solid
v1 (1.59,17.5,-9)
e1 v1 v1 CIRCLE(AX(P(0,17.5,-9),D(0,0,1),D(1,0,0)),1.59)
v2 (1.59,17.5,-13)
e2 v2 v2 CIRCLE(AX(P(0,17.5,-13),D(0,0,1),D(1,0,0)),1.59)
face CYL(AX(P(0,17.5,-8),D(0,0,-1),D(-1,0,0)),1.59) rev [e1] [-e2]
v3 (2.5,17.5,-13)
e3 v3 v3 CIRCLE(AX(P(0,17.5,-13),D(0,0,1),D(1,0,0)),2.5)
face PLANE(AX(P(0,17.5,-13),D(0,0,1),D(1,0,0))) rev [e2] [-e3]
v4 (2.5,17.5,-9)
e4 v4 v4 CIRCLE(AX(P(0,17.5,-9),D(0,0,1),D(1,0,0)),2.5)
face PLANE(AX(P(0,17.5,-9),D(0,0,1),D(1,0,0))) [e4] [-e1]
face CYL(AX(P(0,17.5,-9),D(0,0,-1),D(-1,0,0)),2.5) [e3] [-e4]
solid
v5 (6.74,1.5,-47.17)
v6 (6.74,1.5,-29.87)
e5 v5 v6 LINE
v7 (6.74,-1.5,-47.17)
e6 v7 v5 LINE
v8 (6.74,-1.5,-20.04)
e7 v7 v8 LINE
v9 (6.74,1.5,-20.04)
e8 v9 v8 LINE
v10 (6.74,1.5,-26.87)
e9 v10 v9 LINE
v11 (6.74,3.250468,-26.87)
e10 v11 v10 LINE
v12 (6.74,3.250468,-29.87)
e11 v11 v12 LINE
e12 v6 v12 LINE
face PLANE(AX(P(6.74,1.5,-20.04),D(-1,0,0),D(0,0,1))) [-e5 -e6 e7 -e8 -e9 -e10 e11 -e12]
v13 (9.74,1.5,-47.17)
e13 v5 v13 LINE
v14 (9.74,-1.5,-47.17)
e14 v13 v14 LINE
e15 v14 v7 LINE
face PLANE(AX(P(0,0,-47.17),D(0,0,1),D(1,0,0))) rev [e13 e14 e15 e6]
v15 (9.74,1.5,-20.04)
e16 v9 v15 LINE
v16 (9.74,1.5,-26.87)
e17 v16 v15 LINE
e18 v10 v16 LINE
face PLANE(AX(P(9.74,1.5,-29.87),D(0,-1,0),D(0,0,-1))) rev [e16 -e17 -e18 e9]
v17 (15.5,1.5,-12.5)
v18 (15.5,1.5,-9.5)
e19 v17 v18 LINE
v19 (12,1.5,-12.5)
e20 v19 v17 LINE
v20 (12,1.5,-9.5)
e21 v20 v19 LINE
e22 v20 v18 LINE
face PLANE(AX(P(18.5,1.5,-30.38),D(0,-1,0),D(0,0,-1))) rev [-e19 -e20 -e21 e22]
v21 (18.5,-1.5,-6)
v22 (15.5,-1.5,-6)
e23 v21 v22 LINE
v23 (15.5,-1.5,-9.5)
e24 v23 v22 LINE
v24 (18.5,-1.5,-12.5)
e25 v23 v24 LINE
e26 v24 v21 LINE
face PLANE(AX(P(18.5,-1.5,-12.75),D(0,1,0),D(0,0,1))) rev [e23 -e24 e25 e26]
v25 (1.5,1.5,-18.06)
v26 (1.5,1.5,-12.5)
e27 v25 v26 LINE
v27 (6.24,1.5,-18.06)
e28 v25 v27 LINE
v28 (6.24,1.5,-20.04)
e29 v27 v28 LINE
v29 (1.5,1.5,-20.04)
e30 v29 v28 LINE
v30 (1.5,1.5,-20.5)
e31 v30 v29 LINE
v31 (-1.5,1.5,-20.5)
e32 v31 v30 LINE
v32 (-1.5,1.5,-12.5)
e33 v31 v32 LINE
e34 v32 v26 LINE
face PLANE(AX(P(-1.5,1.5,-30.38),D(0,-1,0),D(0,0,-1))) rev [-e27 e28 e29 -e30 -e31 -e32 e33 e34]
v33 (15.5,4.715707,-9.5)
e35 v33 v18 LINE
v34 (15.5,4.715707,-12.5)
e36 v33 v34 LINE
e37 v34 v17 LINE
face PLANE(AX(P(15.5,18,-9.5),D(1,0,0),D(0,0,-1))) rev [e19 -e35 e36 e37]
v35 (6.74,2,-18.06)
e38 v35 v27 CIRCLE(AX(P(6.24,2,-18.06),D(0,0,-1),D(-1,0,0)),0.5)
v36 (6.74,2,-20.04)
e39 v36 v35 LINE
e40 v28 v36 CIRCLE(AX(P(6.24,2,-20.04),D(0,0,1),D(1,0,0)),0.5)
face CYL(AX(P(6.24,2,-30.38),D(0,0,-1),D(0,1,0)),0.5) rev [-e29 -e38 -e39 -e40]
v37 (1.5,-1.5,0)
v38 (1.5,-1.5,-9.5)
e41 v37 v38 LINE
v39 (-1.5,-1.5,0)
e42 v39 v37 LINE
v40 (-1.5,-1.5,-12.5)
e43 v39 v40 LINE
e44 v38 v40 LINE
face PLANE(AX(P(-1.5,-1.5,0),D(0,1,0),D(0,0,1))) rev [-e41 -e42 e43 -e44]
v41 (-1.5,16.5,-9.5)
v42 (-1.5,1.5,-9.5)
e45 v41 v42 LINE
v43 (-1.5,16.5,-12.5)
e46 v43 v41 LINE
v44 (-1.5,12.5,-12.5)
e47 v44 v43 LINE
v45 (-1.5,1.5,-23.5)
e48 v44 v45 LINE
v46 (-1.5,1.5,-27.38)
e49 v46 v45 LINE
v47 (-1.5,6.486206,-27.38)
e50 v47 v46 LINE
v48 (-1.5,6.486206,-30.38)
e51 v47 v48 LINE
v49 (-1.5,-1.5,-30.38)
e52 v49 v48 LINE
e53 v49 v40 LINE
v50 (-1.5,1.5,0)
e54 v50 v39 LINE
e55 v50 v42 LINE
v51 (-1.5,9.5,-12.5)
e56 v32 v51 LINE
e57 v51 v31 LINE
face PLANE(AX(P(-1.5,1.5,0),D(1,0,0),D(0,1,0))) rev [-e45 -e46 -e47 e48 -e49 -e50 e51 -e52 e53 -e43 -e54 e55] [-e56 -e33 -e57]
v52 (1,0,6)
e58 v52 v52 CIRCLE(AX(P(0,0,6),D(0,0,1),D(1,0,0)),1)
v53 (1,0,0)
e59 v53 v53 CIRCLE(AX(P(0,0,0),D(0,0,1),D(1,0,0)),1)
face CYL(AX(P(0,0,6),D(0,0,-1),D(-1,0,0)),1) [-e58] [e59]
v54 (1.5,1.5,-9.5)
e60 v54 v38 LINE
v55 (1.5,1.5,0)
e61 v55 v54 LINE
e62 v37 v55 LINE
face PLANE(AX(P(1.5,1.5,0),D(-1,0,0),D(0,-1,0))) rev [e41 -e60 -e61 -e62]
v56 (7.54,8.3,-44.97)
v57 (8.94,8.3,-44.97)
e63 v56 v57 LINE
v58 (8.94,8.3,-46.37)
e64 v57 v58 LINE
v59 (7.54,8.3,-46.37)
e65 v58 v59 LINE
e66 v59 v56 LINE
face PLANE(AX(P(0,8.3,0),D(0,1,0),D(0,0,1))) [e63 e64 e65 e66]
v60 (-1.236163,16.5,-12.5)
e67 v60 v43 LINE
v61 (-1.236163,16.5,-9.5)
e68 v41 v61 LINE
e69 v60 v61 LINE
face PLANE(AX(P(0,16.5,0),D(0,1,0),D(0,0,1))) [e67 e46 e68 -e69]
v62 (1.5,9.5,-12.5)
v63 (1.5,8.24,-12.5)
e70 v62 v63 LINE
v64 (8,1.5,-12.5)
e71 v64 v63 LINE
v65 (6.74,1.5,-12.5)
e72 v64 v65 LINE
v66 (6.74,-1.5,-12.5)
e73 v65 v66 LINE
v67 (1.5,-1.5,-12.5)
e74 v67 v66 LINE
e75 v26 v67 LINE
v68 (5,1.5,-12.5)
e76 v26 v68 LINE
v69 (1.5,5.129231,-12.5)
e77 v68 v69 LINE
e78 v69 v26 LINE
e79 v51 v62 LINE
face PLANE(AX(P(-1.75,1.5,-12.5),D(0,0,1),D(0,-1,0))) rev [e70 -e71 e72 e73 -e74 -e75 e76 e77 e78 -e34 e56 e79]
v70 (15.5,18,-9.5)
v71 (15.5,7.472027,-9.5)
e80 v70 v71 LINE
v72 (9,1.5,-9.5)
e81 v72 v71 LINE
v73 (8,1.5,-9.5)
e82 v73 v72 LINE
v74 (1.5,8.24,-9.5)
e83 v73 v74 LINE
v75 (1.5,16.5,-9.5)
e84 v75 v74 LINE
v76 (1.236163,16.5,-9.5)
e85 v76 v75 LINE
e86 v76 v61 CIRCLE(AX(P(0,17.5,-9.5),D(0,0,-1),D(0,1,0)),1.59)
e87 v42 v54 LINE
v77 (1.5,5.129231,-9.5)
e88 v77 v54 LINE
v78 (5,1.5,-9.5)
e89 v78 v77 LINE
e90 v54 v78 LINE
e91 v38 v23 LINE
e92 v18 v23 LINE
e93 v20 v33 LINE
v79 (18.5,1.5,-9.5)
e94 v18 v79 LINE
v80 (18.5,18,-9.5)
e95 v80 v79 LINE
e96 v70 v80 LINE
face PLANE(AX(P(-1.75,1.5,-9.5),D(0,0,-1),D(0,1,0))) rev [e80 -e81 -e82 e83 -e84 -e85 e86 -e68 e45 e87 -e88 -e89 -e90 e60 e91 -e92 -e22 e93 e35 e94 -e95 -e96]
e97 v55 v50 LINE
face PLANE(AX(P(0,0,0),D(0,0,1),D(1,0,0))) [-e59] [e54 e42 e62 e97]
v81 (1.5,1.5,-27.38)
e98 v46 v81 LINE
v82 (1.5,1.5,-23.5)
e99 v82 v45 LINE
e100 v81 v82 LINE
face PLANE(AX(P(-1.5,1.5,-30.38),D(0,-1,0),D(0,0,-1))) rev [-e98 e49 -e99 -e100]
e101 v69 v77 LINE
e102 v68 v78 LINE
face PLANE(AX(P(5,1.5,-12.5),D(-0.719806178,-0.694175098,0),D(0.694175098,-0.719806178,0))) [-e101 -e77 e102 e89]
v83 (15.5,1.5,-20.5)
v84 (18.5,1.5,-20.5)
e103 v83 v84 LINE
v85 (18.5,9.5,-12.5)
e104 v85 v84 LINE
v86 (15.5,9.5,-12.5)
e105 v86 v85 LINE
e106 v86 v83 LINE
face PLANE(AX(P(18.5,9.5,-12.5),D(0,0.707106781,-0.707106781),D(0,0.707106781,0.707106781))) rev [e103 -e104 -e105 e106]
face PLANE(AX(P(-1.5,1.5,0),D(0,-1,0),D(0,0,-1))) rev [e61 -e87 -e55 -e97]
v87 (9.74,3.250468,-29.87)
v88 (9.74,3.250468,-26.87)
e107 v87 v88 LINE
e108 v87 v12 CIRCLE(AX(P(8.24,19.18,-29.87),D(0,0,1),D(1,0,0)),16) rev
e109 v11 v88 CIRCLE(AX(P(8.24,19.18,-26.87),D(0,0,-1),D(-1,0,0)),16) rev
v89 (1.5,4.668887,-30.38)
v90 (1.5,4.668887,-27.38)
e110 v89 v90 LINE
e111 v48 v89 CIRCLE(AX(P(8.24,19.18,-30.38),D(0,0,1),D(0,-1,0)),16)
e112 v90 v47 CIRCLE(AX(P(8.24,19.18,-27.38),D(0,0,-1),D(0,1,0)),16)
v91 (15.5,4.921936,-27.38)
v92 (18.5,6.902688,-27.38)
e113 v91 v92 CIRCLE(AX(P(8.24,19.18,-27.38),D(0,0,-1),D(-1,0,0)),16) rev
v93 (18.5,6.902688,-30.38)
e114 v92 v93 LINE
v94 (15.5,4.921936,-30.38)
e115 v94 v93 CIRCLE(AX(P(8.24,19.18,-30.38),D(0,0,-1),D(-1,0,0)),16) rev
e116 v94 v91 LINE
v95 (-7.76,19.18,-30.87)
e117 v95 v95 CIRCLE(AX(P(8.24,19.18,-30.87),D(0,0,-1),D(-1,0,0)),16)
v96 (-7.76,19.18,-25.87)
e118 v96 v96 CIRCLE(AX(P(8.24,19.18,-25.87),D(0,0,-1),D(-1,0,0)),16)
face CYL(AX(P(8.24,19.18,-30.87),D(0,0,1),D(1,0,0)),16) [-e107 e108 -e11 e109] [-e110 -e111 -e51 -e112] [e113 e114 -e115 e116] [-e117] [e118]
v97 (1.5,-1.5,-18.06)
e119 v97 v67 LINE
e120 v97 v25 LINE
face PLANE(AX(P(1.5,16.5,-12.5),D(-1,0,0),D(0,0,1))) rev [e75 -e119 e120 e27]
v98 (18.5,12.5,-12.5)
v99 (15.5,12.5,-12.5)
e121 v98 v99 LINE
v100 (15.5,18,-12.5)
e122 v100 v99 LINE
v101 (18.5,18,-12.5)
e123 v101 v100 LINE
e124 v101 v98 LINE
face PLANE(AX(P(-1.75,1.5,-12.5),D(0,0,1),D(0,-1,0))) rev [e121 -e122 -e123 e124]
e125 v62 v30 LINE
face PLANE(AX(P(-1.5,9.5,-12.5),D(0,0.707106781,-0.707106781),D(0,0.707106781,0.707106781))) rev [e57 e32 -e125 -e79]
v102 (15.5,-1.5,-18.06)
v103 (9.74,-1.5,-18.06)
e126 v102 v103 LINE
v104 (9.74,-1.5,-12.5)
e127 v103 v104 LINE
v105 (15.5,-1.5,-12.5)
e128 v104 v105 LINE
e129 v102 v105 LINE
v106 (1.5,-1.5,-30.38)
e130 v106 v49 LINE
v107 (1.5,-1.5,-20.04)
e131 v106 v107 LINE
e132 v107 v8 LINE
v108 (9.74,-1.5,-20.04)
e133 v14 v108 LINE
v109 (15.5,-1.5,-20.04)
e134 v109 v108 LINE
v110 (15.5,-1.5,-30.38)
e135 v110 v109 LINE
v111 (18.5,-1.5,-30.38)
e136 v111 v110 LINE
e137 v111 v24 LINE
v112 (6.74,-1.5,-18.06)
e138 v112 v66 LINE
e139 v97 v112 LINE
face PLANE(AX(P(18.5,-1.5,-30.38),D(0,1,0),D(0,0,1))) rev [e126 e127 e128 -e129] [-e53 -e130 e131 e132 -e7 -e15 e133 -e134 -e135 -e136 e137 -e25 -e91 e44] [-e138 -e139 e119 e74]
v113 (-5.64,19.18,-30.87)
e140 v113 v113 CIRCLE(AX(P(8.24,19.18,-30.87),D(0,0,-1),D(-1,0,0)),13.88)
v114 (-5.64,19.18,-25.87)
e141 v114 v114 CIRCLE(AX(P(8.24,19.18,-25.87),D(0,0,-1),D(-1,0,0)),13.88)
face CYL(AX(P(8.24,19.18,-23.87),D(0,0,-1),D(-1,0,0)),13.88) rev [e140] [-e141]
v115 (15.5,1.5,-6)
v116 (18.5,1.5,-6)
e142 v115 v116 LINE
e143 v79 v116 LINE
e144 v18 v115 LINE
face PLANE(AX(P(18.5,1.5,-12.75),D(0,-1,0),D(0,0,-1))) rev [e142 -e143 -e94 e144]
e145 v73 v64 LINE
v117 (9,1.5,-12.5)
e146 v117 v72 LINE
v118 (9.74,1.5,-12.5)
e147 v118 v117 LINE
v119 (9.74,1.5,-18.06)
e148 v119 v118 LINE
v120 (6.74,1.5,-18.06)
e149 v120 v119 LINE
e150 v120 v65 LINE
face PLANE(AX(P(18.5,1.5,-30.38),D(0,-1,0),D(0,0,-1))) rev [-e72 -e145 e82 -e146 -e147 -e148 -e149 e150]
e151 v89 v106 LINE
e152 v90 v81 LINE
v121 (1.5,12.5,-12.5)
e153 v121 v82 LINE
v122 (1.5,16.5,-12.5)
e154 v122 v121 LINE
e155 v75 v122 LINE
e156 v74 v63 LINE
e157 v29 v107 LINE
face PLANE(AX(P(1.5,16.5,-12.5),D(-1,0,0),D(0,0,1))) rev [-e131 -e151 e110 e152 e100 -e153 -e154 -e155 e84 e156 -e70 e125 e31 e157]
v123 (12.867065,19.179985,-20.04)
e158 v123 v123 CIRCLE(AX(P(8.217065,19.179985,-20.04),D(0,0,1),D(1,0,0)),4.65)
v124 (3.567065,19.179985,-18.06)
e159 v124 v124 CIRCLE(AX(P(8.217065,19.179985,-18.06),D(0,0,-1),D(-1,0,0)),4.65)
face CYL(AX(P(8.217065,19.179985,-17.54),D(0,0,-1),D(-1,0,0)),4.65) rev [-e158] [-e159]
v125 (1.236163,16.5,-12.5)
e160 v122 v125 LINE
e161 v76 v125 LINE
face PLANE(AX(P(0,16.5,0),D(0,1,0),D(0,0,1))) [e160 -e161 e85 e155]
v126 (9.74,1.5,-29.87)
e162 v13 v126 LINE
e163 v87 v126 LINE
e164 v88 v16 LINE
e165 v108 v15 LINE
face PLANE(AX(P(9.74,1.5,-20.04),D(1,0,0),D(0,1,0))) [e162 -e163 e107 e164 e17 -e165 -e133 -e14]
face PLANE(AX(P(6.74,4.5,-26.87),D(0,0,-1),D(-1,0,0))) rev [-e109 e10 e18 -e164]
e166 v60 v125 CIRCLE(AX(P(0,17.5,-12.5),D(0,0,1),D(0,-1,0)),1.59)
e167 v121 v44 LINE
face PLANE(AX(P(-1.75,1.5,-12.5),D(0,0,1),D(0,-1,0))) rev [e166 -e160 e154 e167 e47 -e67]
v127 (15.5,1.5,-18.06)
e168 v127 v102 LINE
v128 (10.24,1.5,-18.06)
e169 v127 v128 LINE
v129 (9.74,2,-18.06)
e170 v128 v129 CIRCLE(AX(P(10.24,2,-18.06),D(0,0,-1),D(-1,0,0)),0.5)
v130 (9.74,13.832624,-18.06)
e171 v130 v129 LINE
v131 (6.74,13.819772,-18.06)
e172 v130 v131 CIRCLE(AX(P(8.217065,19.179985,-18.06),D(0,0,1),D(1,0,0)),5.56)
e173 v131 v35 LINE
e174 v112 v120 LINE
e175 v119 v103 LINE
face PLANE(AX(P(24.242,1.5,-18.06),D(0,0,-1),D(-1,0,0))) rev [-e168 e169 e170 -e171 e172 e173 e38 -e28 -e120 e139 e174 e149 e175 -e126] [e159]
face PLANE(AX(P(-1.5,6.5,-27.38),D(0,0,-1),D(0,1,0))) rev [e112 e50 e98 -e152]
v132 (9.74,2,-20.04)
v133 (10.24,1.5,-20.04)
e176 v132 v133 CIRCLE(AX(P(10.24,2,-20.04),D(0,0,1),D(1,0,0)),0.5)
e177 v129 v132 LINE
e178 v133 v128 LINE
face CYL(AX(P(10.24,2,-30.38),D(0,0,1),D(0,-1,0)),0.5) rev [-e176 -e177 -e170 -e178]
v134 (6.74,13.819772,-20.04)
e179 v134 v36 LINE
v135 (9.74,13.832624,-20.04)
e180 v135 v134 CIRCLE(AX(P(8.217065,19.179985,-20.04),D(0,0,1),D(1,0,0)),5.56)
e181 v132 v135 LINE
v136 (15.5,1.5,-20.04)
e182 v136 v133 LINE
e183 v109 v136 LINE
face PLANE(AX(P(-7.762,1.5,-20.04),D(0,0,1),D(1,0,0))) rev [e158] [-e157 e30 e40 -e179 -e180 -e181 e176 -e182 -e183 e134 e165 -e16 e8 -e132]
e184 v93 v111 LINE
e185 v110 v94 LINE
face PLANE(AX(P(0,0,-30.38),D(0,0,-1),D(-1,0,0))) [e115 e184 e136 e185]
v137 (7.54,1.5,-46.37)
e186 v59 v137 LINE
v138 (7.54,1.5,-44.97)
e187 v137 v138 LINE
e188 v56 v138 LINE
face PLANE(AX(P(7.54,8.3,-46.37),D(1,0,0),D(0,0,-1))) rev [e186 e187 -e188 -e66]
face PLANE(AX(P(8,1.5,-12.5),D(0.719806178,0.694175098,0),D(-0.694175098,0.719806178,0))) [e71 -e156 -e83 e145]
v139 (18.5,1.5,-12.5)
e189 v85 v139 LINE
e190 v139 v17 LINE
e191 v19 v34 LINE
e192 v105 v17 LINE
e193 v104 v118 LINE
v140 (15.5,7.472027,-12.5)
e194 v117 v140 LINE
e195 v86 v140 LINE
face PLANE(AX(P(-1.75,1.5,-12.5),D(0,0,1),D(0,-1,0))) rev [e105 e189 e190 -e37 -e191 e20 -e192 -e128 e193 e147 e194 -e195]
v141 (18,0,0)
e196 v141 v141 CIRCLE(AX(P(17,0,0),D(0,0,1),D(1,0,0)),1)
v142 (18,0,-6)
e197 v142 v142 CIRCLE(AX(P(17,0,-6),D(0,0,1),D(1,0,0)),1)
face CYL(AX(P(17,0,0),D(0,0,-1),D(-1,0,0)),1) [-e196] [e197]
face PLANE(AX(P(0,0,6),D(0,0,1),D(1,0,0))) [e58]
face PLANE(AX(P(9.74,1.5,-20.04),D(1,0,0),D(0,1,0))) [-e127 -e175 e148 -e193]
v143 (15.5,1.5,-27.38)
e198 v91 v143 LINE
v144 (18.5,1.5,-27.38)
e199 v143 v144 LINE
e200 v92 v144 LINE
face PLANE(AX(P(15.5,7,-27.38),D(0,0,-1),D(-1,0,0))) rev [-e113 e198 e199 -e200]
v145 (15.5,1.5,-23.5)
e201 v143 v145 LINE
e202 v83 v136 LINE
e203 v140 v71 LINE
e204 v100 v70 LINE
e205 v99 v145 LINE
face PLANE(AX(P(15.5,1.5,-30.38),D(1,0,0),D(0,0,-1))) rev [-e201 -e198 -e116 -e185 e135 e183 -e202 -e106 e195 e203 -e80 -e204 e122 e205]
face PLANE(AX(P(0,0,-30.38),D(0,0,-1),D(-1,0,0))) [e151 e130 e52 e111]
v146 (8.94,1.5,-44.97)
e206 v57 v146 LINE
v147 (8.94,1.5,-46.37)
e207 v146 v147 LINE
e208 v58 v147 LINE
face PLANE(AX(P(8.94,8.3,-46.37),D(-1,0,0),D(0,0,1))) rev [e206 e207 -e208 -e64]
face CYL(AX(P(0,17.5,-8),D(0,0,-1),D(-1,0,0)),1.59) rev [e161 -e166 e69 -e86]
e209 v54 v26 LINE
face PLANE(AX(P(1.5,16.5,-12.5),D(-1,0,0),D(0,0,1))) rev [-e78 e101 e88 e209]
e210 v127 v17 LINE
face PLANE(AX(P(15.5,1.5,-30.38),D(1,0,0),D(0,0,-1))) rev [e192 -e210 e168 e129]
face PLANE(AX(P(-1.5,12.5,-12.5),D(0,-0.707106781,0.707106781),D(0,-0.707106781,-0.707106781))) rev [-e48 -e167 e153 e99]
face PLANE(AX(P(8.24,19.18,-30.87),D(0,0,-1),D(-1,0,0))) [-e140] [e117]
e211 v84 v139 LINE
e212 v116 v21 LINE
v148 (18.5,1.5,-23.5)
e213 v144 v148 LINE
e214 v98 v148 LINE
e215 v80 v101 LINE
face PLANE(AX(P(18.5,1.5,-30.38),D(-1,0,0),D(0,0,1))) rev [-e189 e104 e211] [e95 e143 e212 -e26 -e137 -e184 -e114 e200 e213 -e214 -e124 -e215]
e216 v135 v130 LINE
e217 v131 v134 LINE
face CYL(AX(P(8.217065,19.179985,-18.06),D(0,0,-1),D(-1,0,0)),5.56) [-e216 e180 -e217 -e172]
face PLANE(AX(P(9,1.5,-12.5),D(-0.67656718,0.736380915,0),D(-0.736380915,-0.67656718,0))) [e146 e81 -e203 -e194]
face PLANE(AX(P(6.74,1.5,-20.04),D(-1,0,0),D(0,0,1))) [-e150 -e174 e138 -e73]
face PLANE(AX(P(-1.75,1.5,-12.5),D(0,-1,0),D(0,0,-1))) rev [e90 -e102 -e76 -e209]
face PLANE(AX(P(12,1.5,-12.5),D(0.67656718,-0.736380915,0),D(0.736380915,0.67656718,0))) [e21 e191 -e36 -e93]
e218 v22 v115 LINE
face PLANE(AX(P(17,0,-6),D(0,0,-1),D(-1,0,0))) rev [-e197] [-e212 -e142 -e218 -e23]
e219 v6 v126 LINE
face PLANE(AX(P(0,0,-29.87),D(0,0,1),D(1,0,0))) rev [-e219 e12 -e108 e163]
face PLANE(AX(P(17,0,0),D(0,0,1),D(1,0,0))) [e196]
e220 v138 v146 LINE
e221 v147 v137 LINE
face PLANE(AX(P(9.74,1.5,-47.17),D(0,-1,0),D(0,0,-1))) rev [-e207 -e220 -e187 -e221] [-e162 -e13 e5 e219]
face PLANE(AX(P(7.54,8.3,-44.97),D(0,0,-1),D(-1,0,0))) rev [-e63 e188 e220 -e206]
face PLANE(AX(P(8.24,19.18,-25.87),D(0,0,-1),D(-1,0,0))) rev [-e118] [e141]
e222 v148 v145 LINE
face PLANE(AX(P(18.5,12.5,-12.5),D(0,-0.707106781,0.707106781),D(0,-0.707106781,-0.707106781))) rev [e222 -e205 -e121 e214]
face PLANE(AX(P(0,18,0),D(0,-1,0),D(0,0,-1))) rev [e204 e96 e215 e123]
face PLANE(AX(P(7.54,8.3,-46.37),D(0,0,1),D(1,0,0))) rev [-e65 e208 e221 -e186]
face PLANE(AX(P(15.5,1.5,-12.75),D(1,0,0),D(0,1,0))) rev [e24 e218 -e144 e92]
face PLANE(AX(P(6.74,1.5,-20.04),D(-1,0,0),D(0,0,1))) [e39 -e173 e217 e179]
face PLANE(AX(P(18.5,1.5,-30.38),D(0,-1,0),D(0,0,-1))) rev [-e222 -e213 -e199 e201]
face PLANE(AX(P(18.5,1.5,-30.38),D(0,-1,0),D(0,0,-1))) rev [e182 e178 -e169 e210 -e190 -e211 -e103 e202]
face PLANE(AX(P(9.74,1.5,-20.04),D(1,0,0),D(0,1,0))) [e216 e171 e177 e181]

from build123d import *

# Parameters (mm, degrees)
SKETCH3_W            = 3
SKETCH3_H            = 3
SKETCH7_W            = 3
SKETCH7_H            = 3
BOSS_EXTRUDE1_DEPTH  = 16.5
SKETCH12_R           = 2.5
BOSS_EXTRUDE4_DEPTH  = 2
SKETCH17_R           = 1
BOSS_EXTRUDE5_DEPTH  = 6
SKETCH18_R           = 1
BOSS_EXTRUDE6_DEPTH  = 6
SKETCH19_W           = 3
SKETCH19_H           = 3
BOSS_EXTRUDE7_DEPTH  = 7.54
SKETCH21_W           = 3
SKETCH21_H           = 1.98
BOSS_EXTRUDE8_DEPTH  = 17.68
SKETCH22_R           = 5.56
BOSS_EXTRUDE9_DEPTH  = 0.99
SKETCH23_R           = 4.65
CUT_EXTRUDE2_DEPTH   = 2.5
SKETCH24_W           = 3
SKETCH24_H           = 3
BOSS_EXTRUDE10_DEPTH = 9.83
SKETCH25_W           = 3
SKETCH25_H           = 3
BOSS_EXTRUDE11_DEPTH = 3
SKETCH27_R           = 16
BOSS_EXTRUDE12_DEPTH = 2.5
SKETCH28_R           = 13.88
CUT_EXTRUDE3_DEPTH   = 7
SKETCH31_W           = 3
SKETCH31_H           = 3
BOSS_EXTRUDE13_DEPTH = 17.3
SKETCH32_W           = 1.4
SKETCH32_H           = 1.4
BOSS_EXTRUDE14_DEPTH = 6.8
SKETCH33_W           = 3
SKETCH33_H           = 3
BOSS_EXTRUDE15_DEPTH = 17.88
SKETCH34_W           = 3
SKETCH34_H           = 3
BOSS_EXTRUDE16_DEPTH = 5.5
SKETCH36_W           = 3
SKETCH36_H           = 3
SKETCH16_R           = 1.59
CUT_EXTRUDE7_DEPTH   = 5
SKETCH41_W           = 3
SKETCH41_H           = 3
BOSS_EXTRUDE17_DEPTH = 17.88
SKETCH42_W           = 3
SKETCH42_H           = 3
BOSS_EXTRUDE18_DEPTH = 5
SKETCH43_W           = 3
SKETCH43_H           = 3
BOSS_EXTRUDE19_DEPTH = 16.5
SKETCH47_W           = 3
SKETCH47_H           = 3
SKETCH53_W           = 3
SKETCH53_H           = 3
BOSS_EXTRUDE20_REACH = 63.391
SKETCH55_W           = 1.98
SKETCH55_H           = 3
BOSS_EXTRUDE21_REACH = 63.391
SKETCH56_W           = 1.98
SKETCH56_H           = 3
FILLET1_R            = 0.5
FILLET2_R            = 0.5


with BuildPart() as part:
    # Sweep3: sweep along a path in Sketch4
    with BuildLine(Plane(origin=(0, 0, 0), x_dir=(1, 0, 0), z_dir=(0, 1, 0))) as sweep3_path:
        Line((0, 0), (0, 11))
        Line((0, 11), (17, 11))
        Line((17, 11), (17, 6))
    # Sketch3 → Sweep3 (sweep)
    with BuildSketch(Plane.XY):
        Rectangle(SKETCH3_W, SKETCH3_H)
    sweep(path=sweep3_path.line, transition=Transition.RIGHT)

    # Sketch7 → Boss-Extrude1 (add)
    with BuildSketch(Plane(origin=(0, 0, 0), x_dir=(1, 0, 0), z_dir=(0, 1, 0))):
        with Locations((0, 11)):
            Rectangle(SKETCH7_W, SKETCH7_H)
    extrude(amount=BOSS_EXTRUDE1_DEPTH)

    # Sketch17 → Boss-Extrude5 (add)
    with BuildSketch(Plane.XY):
        Circle(SKETCH17_R)
    extrude(amount=BOSS_EXTRUDE5_DEPTH)

    # Sketch18 → Boss-Extrude6 (add)
    with BuildSketch(Plane.XY.offset(-6)):
        with Locations((17, 0)):
            Circle(SKETCH18_R)
    extrude(amount=BOSS_EXTRUDE6_DEPTH)

    # Sweep4: sweep along a path in Sketch39
    with BuildLine(Plane.XY.offset(-11)) as sweep4_path:
        Line((6.5, 1.5), (0, 8.24))
    # Sketch36 → Sweep4 (sweep)
    with BuildSketch(Plane(origin=(0, 1.5, 0), x_dir=(1, 0, 0), z_dir=(0, 1, 0))):
        with Locations((6.5, 11)):
            Rectangle(SKETCH36_W, SKETCH36_H)
    sweep(path=sweep4_path.line)


with BuildPart() as body_2:
    # Sketch12 → Boss-Extrude4 (new, symmetric)
    with BuildSketch(Plane.XY.offset(-11)):
        with Locations((0, 17.5)):
            Circle(SKETCH12_R)
    extrude(amount=BOSS_EXTRUDE4_DEPTH, both=True)


with BuildPart() as body_3:
    # Sketch19 → Boss-Extrude7 (new body)
    with BuildSketch(Plane.XY.offset(-12.5)):
        with Locations((8.24, 0)):
            Rectangle(SKETCH19_W, SKETCH19_H)
    extrude(amount=-BOSS_EXTRUDE7_DEPTH)

    # Sketch21 → Boss-Extrude8 (add)
    with BuildSketch(Plane(origin=(0, 1.5, 0), x_dir=(1, 0, 0), z_dir=(0, 1, 0))):
        with Locations((8.24, 19.05)):
            Rectangle(SKETCH21_W, SKETCH21_H)
    extrude(amount=BOSS_EXTRUDE8_DEPTH)

    # Sketch22 → Boss-Extrude9 (add, symmetric)
    with BuildSketch(Plane.XY.offset(-19.05)):
        with Locations((8.217064706, 19.179985124)):
            Circle(SKETCH22_R)
    extrude(amount=BOSS_EXTRUDE9_DEPTH, both=True)

    # Sketch23 → Cut-Extrude2 (cut, symmetric)
    with BuildSketch(Plane(origin=(0, 0, -20.04), x_dir=(-1, 0, 0), z_dir=(0, 0, -1))):
        with Locations((-8.217064706, 19.179985124)):
            Circle(SKETCH23_R)
    extrude(amount=CUT_EXTRUDE2_DEPTH, both=True, mode=Mode.SUBTRACT)

    # Sketch24 → Boss-Extrude10 (add)
    with BuildSketch(Plane(origin=(0, 0, -20.04), x_dir=(-1, 0, 0), z_dir=(0, 0, -1))):
        with Locations((-8.24, 0)):
            Rectangle(SKETCH24_W, SKETCH24_H)
    extrude(amount=BOSS_EXTRUDE10_DEPTH)

    # Sketch25 → Boss-Extrude11 (add)
    with BuildSketch(Plane(origin=(0, 1.5, 0), x_dir=(1, 0, 0), z_dir=(0, 1, 0))):
        with Locations((8.24, 28.37)):
            Rectangle(SKETCH25_W, SKETCH25_H)
    extrude(amount=BOSS_EXTRUDE11_DEPTH)

    # Sketch27 → Boss-Extrude12 (add, symmetric)
    with BuildSketch(Plane(origin=(0, 0, -28.37), x_dir=(-1, 0, 0), z_dir=(0, 0, -1))):
        with Locations((-8.24, 19.18)):
            Circle(SKETCH27_R)
    extrude(amount=BOSS_EXTRUDE12_DEPTH, both=True)

    # Sketch28 → Cut-Extrude3 (cut)
    with BuildSketch(Plane(origin=(0, 0, -30.87), x_dir=(-1, 0, 0), z_dir=(0, 0, -1))):
        with Locations((-8.24, 19.18)):
            Circle(SKETCH28_R)
    extrude(amount=-CUT_EXTRUDE3_DEPTH, mode=Mode.SUBTRACT)

    # Sketch31 → Boss-Extrude13 (add)
    with BuildSketch(Plane(origin=(0, 0, -29.87), x_dir=(-1, 0, 0), z_dir=(0, 0, -1))):
        with Locations((-8.24, 0)):
            Rectangle(SKETCH31_W, SKETCH31_H)
    extrude(amount=BOSS_EXTRUDE13_DEPTH)

    # Sketch32 → Boss-Extrude14 (add)
    with BuildSketch(Plane(origin=(0, 1.5, 0), x_dir=(1, 0, 0), z_dir=(0, 1, 0))):
        with Locations((8.24, 45.67)):
            Rectangle(SKETCH32_W, SKETCH32_H)
    extrude(amount=BOSS_EXTRUDE14_DEPTH)



with BuildPart() as body_4:
    # Sketch33 → Boss-Extrude15 (new body)
    with BuildSketch(Plane(origin=(0, 0, -12.5), x_dir=(-1, 0, 0), z_dir=(0, 0, -1))):
        with Locations((-17, 0)):
            Rectangle(SKETCH33_W, SKETCH33_H)
    extrude(amount=BOSS_EXTRUDE15_DEPTH)

    # Sketch34 → Boss-Extrude16 (add)
    with BuildSketch(Plane(origin=(0, 1.5, 0), x_dir=(1, 0, 0), z_dir=(0, 1, 0))):
        with Locations((17, 28.88)):
            Rectangle(SKETCH34_W, SKETCH34_H)
    extrude(amount=BOSS_EXTRUDE16_DEPTH)


with BuildPart() as cut_extrude7_tool:
    # Sketch16 → Cut-Extrude7 (new, symmetric)
    with BuildSketch(Plane(origin=(0, 0, -13), x_dir=(-1, 0, 0), z_dir=(0, 0, -1))):
        with Locations(Location((0, 17.5, 0), (0, 0, 180))):
            Circle(SKETCH16_R)
    extrude(amount=CUT_EXTRUDE7_DEPTH, both=True)


with BuildPart() as part_1:
    add(part.part)

    # Cut-Extrude7: cut by cut_extrude7_tool
    add(cut_extrude7_tool.part, mode=Mode.SUBTRACT)


with BuildPart() as body_2_1:
    add(body_2.part)

    # Cut-Extrude7: cut by cut_extrude7_tool
    add(cut_extrude7_tool.part, mode=Mode.SUBTRACT)


with BuildPart() as body_3_1:
    add(body_3.part)

    add(part_1.part)  # Boss-Extrude17 merges part
    # Sketch41 → Boss-Extrude17 (add)
    with BuildSketch(Plane(origin=(0, 0, -12.5), x_dir=(-1, 0, 0), z_dir=(0, 0, -1))):
        Rectangle(SKETCH41_W, SKETCH41_H)
    extrude(amount=BOSS_EXTRUDE17_DEPTH)

    # Sketch42 → Boss-Extrude18 (add)
    with BuildSketch(Plane(origin=(0, 1.5, 0), x_dir=(1, 0, 0), z_dir=(0, 1, 0))):
        with Locations((0, 28.88)):
            Rectangle(SKETCH42_W, SKETCH42_H)
    extrude(amount=BOSS_EXTRUDE18_DEPTH)


    add(body_4.part)  # Boss-Extrude19 merges body 4
    # Sketch43 → Boss-Extrude19 (add)
    with BuildSketch(Plane(origin=(0, 1.5, 0), x_dir=(1, 0, 0), z_dir=(0, 1, 0))):
        with Locations((17, 11)):
            Rectangle(SKETCH43_W, SKETCH43_H)
    extrude(amount=BOSS_EXTRUDE19_DEPTH)

    # Sweep5: sweep along a path in Sketch51
    with BuildLine(Plane.XY.offset(-11)) as sweep5_path:
        Line((10.5, 1.5), (17, 7.472026952))
    # Sketch47 → Sweep5 (sweep)
    with BuildSketch(Plane(origin=(0, 1.5, 0), x_dir=(1, 0, 0), z_dir=(0, 1, 0))):
        with Locations((10.5, 11)):
            Rectangle(SKETCH47_W, SKETCH47_H)
    sweep(path=sweep5_path.line)

    # Sweep6: sweep along a path in Sketch54
    with BuildLine(Plane.ZY.offset(1.5)) as sweep6_path:
        Line((-12.5, 11), (-23.5, 0))
    # Sketch53 → Sweep6 (sweep)
    with BuildSketch(Plane.XY.offset(-12.5)):
        with Locations((0, 11)):
            Rectangle(SKETCH53_W, SKETCH53_H)
    sweep6 = sweep(path=sweep6_path.line)

    # Mirror11: Sweep6 across plane
    add(sweep6.mirror(Plane.ZY.offset(-8.5)))

    # Sketch55 → Boss-Extrude20 (add, up to next)
    with BuildSketch(Plane.ZY.offset(-6.74), mode=Mode.PRIVATE) as boss_extrude20_sk1:
        with Locations((-19.05, 0)):
            Rectangle(SKETCH55_W, SKETCH55_H)
    boss_extrude20_tool1 = extrude(boss_extrude20_sk1.sketch, amount=BOSS_EXTRUDE20_REACH, mode=Mode.PRIVATE) - body_3_1.part
    add(boss_extrude20_tool1.solids().sort_by_distance((6.74, 0, -19.05))[0])

    # Sketch56 → Boss-Extrude21 (add, up to next)
    with BuildSketch(Plane(origin=(9.74, 0, 0), x_dir=(0, 0, -1), z_dir=(1, 0, 0)), mode=Mode.PRIVATE) as boss_extrude21_sk1:
        with Locations((19.05, 0)):
            Rectangle(SKETCH56_W, SKETCH56_H)
    boss_extrude21_tool1 = extrude(boss_extrude21_sk1.sketch, amount=BOSS_EXTRUDE21_REACH, mode=Mode.PRIVATE) - body_3_1.part
    add(boss_extrude21_tool1.solids().sort_by_distance((9.74, 0, -19.05))[0])

    # Fillet1
    # the kernel refuses this fillet: 0.5 mm, written as the material it adds along each edge
    with BuildSketch(Plane(origin=(6.74, 1.5, -20.04), x_dir=(-1, 0, 0), z_dir=(0, 0, 1))) as fillet1_piece_1:
        with BuildLine():
            CenterArc((FILLET1_R, -FILLET1_R), FILLET1_R, 90, 90)
            Line((0, -FILLET1_R), (0, 0))
            Line((0, 0), (FILLET1_R, 0))
        make_face()
    extrude(amount=1.98)

    # Fillet2
    # the kernel refuses this fillet: 0.5 mm, written as the material it adds along each edge
    with BuildSketch(Plane(origin=(9.74, 1.5, -18.06), x_dir=(0, 1, 0), z_dir=(0, 0, -1))) as fillet2_piece_1:
        with BuildLine():
            CenterArc((FILLET2_R, FILLET2_R), FILLET2_R, 180, 90)
            Line((0, FILLET2_R), (0, 0))
            Line((0, 0), (FILLET2_R, 0))
        make_face()
    extrude(amount=1.98)


solid = Compound([body_2_1.part, body_3_1.part])
